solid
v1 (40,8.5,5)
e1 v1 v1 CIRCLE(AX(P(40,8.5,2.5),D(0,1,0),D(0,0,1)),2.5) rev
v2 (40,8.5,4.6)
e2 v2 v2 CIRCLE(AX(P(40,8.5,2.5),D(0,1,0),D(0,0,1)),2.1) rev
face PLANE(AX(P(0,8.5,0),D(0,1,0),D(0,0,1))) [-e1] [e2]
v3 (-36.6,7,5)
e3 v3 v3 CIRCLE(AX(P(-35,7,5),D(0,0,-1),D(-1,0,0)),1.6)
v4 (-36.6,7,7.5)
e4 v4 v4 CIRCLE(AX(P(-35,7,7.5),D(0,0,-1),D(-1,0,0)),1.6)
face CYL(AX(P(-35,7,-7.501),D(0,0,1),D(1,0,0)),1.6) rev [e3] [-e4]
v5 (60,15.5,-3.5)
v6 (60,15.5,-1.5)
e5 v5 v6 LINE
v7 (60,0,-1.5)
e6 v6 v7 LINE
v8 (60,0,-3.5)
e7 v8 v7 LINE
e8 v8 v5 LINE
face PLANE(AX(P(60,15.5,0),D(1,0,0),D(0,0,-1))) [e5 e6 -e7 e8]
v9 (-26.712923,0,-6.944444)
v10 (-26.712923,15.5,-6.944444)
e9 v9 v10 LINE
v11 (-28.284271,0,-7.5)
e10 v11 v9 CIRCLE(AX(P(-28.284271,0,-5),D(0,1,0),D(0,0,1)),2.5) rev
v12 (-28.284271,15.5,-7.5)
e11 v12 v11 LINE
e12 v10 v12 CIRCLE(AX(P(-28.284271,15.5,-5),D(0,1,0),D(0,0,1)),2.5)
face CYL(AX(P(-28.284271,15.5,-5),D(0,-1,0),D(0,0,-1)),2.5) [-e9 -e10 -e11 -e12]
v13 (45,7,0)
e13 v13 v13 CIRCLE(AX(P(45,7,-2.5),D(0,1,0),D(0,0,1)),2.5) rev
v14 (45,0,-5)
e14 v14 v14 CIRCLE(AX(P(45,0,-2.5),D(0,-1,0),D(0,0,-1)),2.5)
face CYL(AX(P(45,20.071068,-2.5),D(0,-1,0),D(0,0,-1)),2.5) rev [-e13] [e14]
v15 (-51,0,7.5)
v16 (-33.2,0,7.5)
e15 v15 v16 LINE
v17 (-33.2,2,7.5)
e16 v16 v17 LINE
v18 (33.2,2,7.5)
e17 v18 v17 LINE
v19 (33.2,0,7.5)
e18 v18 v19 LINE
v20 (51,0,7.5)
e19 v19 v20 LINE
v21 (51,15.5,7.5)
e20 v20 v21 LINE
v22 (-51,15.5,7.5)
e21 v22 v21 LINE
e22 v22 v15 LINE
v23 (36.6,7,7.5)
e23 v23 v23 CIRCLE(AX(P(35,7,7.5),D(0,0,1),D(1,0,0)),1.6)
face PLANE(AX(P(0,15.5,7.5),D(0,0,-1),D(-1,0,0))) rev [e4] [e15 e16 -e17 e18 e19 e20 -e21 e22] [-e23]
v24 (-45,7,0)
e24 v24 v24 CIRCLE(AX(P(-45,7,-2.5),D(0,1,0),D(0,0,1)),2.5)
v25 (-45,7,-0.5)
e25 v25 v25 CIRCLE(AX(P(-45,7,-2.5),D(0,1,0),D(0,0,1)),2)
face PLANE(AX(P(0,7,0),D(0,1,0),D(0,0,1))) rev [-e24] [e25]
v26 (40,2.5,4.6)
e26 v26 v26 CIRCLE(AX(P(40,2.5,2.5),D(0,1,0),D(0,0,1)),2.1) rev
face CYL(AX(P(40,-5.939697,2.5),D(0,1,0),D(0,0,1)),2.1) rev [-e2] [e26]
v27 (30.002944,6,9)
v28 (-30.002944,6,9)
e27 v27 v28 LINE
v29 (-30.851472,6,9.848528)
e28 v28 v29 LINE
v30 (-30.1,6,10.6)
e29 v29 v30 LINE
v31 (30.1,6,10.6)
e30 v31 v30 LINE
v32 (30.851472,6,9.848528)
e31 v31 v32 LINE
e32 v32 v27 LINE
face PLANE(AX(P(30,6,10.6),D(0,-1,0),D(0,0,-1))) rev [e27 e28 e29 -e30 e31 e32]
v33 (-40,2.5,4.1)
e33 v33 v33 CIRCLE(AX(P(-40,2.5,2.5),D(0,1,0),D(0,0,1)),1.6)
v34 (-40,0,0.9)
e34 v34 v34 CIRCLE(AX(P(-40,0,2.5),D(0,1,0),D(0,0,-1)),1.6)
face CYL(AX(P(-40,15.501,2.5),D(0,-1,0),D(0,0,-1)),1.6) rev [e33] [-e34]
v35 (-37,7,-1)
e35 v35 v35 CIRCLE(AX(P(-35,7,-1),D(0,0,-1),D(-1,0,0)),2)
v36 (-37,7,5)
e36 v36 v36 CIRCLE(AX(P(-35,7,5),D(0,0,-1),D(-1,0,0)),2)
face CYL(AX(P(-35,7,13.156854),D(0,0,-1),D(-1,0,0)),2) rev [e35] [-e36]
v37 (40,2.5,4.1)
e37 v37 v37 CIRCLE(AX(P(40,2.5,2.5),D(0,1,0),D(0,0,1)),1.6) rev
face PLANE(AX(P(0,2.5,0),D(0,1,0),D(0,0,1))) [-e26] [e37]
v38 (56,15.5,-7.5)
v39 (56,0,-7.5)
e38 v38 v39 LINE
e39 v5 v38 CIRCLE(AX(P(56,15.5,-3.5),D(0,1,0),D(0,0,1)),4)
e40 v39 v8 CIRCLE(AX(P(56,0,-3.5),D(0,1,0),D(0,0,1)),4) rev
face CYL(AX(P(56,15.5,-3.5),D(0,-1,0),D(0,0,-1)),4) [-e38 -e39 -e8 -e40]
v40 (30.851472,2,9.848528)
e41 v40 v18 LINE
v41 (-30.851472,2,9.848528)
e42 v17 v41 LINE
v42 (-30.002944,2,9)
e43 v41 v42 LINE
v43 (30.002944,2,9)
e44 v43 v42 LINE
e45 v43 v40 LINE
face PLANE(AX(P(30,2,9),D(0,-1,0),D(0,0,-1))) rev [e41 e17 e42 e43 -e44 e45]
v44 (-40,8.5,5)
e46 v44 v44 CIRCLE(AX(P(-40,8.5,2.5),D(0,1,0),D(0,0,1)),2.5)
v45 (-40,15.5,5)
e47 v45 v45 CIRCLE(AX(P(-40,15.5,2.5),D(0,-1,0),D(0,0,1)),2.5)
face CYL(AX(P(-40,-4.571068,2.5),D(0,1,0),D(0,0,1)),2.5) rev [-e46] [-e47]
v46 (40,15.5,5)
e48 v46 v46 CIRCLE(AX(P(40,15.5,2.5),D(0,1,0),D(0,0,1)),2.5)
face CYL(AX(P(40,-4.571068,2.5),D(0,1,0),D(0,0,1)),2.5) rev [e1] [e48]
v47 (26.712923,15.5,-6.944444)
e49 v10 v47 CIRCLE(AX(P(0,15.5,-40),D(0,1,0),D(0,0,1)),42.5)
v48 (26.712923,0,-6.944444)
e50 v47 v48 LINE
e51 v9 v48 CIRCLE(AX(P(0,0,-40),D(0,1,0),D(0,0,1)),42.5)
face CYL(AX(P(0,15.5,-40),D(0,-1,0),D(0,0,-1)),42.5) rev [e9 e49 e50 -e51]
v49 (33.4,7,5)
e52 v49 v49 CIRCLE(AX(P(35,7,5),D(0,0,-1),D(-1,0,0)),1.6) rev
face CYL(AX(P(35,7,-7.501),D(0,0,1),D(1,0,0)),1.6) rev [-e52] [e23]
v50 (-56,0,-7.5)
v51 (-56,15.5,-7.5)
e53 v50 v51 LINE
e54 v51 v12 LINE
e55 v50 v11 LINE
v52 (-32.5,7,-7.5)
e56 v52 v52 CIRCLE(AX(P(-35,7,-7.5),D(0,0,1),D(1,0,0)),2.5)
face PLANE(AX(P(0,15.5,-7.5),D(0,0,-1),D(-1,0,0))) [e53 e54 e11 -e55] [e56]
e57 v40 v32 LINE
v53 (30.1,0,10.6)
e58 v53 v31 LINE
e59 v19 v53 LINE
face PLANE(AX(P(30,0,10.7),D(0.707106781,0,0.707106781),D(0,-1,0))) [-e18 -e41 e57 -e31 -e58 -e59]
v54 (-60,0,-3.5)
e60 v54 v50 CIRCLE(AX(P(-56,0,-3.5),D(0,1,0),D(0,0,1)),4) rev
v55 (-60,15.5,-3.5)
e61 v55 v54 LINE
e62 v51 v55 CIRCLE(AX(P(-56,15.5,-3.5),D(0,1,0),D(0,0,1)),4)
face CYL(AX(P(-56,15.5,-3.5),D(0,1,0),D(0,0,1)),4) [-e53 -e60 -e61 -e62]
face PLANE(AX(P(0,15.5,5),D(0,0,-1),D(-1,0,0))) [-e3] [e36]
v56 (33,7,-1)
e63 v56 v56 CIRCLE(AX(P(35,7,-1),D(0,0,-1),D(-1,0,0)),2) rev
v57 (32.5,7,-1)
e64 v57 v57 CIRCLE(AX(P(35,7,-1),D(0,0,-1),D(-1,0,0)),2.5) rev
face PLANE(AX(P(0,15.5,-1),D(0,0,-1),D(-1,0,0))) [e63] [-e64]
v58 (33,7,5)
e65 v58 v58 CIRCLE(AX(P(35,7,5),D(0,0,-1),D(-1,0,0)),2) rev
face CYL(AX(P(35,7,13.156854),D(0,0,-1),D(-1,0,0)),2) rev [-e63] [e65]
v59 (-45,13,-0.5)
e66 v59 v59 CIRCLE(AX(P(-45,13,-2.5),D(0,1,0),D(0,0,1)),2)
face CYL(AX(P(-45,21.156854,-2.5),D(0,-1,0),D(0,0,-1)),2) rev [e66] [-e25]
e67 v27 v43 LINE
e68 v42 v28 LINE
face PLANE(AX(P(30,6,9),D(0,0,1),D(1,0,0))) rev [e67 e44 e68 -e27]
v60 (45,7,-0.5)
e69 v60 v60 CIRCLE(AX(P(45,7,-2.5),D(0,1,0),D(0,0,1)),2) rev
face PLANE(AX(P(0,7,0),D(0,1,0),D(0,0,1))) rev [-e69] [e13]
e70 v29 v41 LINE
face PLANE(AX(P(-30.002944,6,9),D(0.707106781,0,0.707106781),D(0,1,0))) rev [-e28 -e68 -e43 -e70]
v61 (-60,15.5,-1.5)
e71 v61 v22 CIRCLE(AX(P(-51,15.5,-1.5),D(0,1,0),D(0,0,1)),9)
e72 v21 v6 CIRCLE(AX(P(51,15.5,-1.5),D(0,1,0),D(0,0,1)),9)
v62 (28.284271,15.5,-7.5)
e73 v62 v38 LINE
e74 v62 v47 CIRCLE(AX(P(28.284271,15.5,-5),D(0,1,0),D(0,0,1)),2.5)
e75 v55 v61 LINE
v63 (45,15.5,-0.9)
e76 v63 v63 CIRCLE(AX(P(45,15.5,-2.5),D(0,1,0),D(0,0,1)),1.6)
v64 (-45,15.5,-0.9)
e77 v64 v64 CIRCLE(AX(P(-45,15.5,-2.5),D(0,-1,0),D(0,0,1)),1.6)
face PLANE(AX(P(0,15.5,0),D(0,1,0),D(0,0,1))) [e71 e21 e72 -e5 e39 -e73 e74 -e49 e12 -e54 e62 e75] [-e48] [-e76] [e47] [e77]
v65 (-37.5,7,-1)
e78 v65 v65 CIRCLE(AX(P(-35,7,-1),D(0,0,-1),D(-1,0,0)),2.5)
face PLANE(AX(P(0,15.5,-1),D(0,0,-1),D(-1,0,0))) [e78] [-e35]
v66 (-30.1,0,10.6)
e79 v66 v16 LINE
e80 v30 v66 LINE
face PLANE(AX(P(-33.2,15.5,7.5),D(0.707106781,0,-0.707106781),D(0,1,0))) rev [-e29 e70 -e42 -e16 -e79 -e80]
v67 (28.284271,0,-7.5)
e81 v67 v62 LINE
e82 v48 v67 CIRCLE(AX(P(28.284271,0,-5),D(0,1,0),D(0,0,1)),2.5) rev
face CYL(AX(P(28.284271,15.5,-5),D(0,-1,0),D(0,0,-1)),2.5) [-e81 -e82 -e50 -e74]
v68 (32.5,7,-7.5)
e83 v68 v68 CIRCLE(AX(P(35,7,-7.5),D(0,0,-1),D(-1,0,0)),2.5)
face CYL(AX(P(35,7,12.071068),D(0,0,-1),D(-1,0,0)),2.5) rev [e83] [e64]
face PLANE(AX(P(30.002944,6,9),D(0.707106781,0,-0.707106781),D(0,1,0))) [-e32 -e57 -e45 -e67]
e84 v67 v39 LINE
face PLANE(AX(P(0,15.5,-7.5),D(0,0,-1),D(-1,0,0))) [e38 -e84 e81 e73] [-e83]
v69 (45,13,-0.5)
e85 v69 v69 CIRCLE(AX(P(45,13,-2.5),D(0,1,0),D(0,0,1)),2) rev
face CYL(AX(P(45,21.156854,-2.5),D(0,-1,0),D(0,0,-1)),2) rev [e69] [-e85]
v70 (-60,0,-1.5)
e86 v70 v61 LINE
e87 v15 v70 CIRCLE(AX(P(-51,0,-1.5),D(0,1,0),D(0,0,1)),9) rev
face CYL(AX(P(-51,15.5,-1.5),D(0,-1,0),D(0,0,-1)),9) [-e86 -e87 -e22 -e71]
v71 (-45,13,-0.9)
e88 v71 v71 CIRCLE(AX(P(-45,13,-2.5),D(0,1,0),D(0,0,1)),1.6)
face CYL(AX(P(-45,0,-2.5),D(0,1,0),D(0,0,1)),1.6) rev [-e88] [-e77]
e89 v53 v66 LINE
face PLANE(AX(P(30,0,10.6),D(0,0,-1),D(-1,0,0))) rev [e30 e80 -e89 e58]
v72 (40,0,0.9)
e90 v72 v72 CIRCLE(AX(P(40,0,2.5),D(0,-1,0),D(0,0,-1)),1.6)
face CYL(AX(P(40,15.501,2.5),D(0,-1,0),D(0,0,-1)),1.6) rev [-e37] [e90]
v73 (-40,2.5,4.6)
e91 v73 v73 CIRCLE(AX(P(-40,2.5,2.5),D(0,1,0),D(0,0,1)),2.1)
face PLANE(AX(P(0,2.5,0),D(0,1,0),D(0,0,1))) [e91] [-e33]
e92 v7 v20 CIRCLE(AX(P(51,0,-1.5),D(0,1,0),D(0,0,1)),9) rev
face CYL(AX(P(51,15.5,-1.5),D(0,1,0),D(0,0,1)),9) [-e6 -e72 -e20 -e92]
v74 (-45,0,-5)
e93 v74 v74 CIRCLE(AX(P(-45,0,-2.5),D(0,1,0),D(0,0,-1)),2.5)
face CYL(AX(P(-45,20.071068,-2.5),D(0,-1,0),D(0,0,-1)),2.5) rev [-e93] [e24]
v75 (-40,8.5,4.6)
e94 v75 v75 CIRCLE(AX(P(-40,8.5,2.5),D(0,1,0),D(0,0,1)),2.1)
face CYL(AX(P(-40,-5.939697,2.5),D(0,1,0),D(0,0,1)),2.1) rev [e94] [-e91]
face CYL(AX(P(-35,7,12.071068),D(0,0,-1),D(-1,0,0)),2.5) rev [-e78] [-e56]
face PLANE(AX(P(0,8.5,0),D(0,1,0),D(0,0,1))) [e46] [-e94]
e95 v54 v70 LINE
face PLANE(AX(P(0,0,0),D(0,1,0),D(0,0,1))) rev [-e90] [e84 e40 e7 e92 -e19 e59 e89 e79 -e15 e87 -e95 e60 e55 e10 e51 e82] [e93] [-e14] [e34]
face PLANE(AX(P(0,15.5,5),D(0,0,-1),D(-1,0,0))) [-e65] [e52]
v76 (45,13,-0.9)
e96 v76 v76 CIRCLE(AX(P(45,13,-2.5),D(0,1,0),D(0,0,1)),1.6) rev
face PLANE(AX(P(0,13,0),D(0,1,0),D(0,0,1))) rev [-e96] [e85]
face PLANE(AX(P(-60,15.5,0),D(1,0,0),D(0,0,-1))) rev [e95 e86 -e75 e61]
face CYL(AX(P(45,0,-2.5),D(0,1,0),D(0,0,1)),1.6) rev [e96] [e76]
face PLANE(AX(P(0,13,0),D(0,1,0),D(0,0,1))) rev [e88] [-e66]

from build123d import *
from OCP.BRepFilletAPI import BRepFilletAPI_MakeChamfer, BRepFilletAPI_MakeFillet

# Parameters (mm, degrees)
BOSS_EXTRU_1_DEPTH      = 15.5
BOSS_EXTRU_2_DEPTH      = 30
ESQUISSE2_R             = 1.6
ENL_V_MAT_EXTRU_1_DEPTH = 63.869786066
ESQUISSE3_R             = 2
ENL_V_MAT_EXTRU_2_DEPTH = 13
ESQUISSE9_R             = 2.5
ENL_V_MAT_EXTRU_7_DEPTH = 7
ENL_V_MAT_EXTRU_3_REACH = 64.87
ESQUISSE5_R             = 1.6
ESQUISSE6_R             = 2.1
ENL_V_MAT_EXTRU_4_DEPTH = 13
ESQUISSE10_R            = 2.5
ENL_V_MAT_EXTRU_8_DEPTH = 7
ENL_V_MAT_EXTRU_5_REACH = 65.759
ESQUISSE7_R             = 1.6
ESQUISSE8_R             = 2
ENL_V_MAT_EXTRU_6_DEPTH = 12.5
ESQUISSE11_R            = 2.5
ENL_V_MAT_EXTRU_9_DEPTH = 6.5
CONG_1_R1               = 2.5
CONG_1_R2               = 4
CONG_1_R3               = 9
CHANFREIN1_SIZE         = 3.2
CHANFREIN2_SIZE         = 1.2
CHANFREIN2_SIZE2        = 1.697056275


with BuildPart() as part:
    # Esquisse1 → Boss.-Extru.1 (new body)
    with BuildSketch(Plane(origin=(0, 0, 0), x_dir=(1, 0, 0), z_dir=(0, 1, 0))):
        with BuildLine():
            Line((-27.386127875, 7.5), (-60, 7.5))
            Line((-60, 7.5), (-60, -7.5))
            Line((-60, -7.5), (60, -7.5))
            Line((60, -7.5), (60, 7.5))
            Line((60, 7.5), (27.386127875, 7.5))
            ThreePointArc((27.386127875, 7.5), (0, -2.5), (-27.386127875, 7.5))
        make_face()
    extrude(amount=BOSS_EXTRU_1_DEPTH)

    # Esquisse12 → Boss.-Extru.2 (add, symmetric)
    with BuildSketch(Plane(origin=(0, 0, 0), x_dir=(0, 0, -1), z_dir=(1, 0, 0))):
        Polygon((-7.5, 0), (-10.6, 0), (-10.6, 6), (-9, 6), (-9, 2), (-7.5, 2), align=None)
    extrude(amount=BOSS_EXTRU_2_DEPTH, both=True)

    # Esquisse2 → Enlèv. mat.-Extru.1 (cut, through all)
    with BuildSketch(Plane(origin=(0, 15.5, 0), x_dir=(1, 0, 0), z_dir=(0, 1, 0))):
        with Locations(Location((45, 2.5, 0), (0, 0, 270))):
            Circle(ESQUISSE2_R)
    enl_v_mat_extru_1 = extrude(amount=-ENL_V_MAT_EXTRU_1_DEPTH, mode=Mode.SUBTRACT)

    # Esquisse3 → Enlèv. mat.-Extru.2 (cut)
    with BuildSketch(Plane.XZ):
        with Locations(Location((45, -2.5, 0), (0, 0, 270))):
            Circle(ESQUISSE3_R)
    enl_v_mat_extru_2 = extrude(amount=-ENL_V_MAT_EXTRU_2_DEPTH, mode=Mode.SUBTRACT)

    # Esquisse9 → Enlèv. mat.-Extru.7 (cut)
    with BuildSketch(Plane.XZ):
        with Locations(Location((45, -2.5, 0), (0, 0, 270))):
            Circle(ESQUISSE9_R)
    enl_v_mat_extru_7 = extrude(amount=-ENL_V_MAT_EXTRU_7_DEPTH, mode=Mode.SUBTRACT)

    # Esquisse5 → Enlèv. mat.-Extru.3 (cut, up to next)
    with BuildSketch(Plane.XZ, mode=Mode.PRIVATE) as enl_v_mat_extru_3_sk1:
        with Locations(Location((40, 2.5, 0), (0, 0, 270))):
            Circle(ESQUISSE5_R)
    enl_v_mat_extru_3_tool1 = extrude(enl_v_mat_extru_3_sk1.sketch, amount=-ENL_V_MAT_EXTRU_3_REACH, mode=Mode.PRIVATE) & part.part
    enl_v_mat_extru_3 = enl_v_mat_extru_3_tool1.solids().sort_by_distance((40, 0, 2.5))[0]
    add(enl_v_mat_extru_3, mode=Mode.SUBTRACT)

    # Esquisse6 → Enlèv. mat.-Extru.4 (cut)
    with BuildSketch(Plane(origin=(0, 15.5, 0), x_dir=(1, 0, 0), z_dir=(0, 1, 0))):
        with Locations(Location((40, -2.5, 0), (0, 0, 270))):
            Circle(ESQUISSE6_R)
    enl_v_mat_extru_4 = extrude(amount=-ENL_V_MAT_EXTRU_4_DEPTH, mode=Mode.SUBTRACT)

    # Esquisse10 → Enlèv. mat.-Extru.8 (cut)
    with BuildSketch(Plane(origin=(0, 15.5, 0), x_dir=(1, 0, 0), z_dir=(0, 1, 0))):
        with Locations(Location((40, -2.5, 0), (0, 0, 270))):
            Circle(ESQUISSE10_R)
    enl_v_mat_extru_8 = extrude(amount=-ENL_V_MAT_EXTRU_8_DEPTH, mode=Mode.SUBTRACT)

    # Esquisse7 → Enlèv. mat.-Extru.5 (cut, up to next)
    with BuildSketch(Plane.XY.offset(7.5), mode=Mode.PRIVATE) as enl_v_mat_extru_5_sk1:
        with Locations((35, 7)):
            Circle(ESQUISSE7_R)
    enl_v_mat_extru_5_tool1 = extrude(enl_v_mat_extru_5_sk1.sketch, amount=-ENL_V_MAT_EXTRU_5_REACH, mode=Mode.PRIVATE) & part.part
    enl_v_mat_extru_5 = enl_v_mat_extru_5_tool1.solids().sort_by_distance((35, 7, 7.5))[0]
    add(enl_v_mat_extru_5, mode=Mode.SUBTRACT)

    # Esquisse8 → Enlèv. mat.-Extru.6 (cut)
    with BuildSketch(Plane(origin=(0, 0, -7.5), x_dir=(-1, 0, 0), z_dir=(0, 0, -1))):
        with Locations((-35, 7)):
            Circle(ESQUISSE8_R)
    enl_v_mat_extru_6 = extrude(amount=-ENL_V_MAT_EXTRU_6_DEPTH, mode=Mode.SUBTRACT)

    # Esquisse11 → Enlèv. mat.-Extru.9 (cut)
    with BuildSketch(Plane(origin=(0, 0, -7.5), x_dir=(-1, 0, 0), z_dir=(0, 0, -1))):
        with Locations((-35, 7)):
            Circle(ESQUISSE11_R)
    enl_v_mat_extru_9 = extrude(amount=-ENL_V_MAT_EXTRU_9_DEPTH, mode=Mode.SUBTRACT)

    # Symétrie1: Enlèv. mat.-Extru.1, Enlèv. mat.-Extru.2, Enlèv. mat.-Extru.7, Enlèv. mat.-Extru.3, Enlèv. mat.-Extru.4, Enlèv. mat.-Extru.8, Enlèv. mat.-Extru.5, Enlèv. mat.-Extru.6, Enlèv. mat.-Extru.9 across plane
    add(enl_v_mat_extru_1.mirror(Plane(origin=(0, 0, 0), x_dir=(0, 0, 1), z_dir=(1, 0, 0))), mode=Mode.SUBTRACT)
    add(enl_v_mat_extru_2.mirror(Plane(origin=(0, 0, 0), x_dir=(0, 0, 1), z_dir=(1, 0, 0))), mode=Mode.SUBTRACT)
    add(enl_v_mat_extru_7.mirror(Plane(origin=(0, 0, 0), x_dir=(0, 0, 1), z_dir=(1, 0, 0))), mode=Mode.SUBTRACT)
    add(enl_v_mat_extru_3.mirror(Plane(origin=(0, 0, 0), x_dir=(0, 0, 1), z_dir=(1, 0, 0))), mode=Mode.SUBTRACT)
    add(enl_v_mat_extru_4.mirror(Plane(origin=(0, 0, 0), x_dir=(0, 0, 1), z_dir=(1, 0, 0))), mode=Mode.SUBTRACT)
    add(enl_v_mat_extru_8.mirror(Plane(origin=(0, 0, 0), x_dir=(0, 0, 1), z_dir=(1, 0, 0))), mode=Mode.SUBTRACT)
    add(enl_v_mat_extru_5.mirror(Plane(origin=(0, 0, 0), x_dir=(0, 0, 1), z_dir=(1, 0, 0))), mode=Mode.SUBTRACT)
    add(enl_v_mat_extru_6.mirror(Plane(origin=(0, 0, 0), x_dir=(0, 0, 1), z_dir=(1, 0, 0))), mode=Mode.SUBTRACT)
    add(enl_v_mat_extru_9.mirror(Plane(origin=(0, 0, 0), x_dir=(0, 0, 1), z_dir=(1, 0, 0))), mode=Mode.SUBTRACT)

    # Congé1: one fillet with a radius per group of edges: ONE call of the kernel's fillet builder (fillet() takes one radius for all edges)
    cong_1_edges_1 = [part.edges().sort_by_distance(p)[0] for p in [
        (27.386127875, 7.75, -7.5),
        (-27.386127875, 7.75, -7.5),
    ]]
    cong_1_edges_2 = [part.edges().sort_by_distance(p)[0] for p in [
        (60, 7.75, -7.5),
        (-60, 7.75, -7.5),
    ]]
    cong_1_edges_3 = [part.edges().sort_by_distance(p)[0] for p in [
        (60, 7.75, 7.5),
        (-60, 7.75, 7.5),
    ]]
    cong_1 = BRepFilletAPI_MakeFillet(part.part.solid().wrapped)
    for e in cong_1_edges_1:
        cong_1.Add(CONG_1_R1, e.wrapped)
    for e in cong_1_edges_2:
        cong_1.Add(CONG_1_R2, e.wrapped)
    for e in cong_1_edges_3:
        cong_1.Add(CONG_1_R3, e.wrapped)
    add(Compound.cast(cong_1.Shape()), mode=Mode.REPLACE)

    # Chanfrein1
    # the kernel refuses this chamfer: 3.2 mm, written as the material it adds along each edge
    with BuildSketch(Plane(origin=(30, 10.229385561, 7.5), x_dir=(0.9996219169112968, 0, -0.027495876610586226), z_dir=(0, -1, 0))) as chanfrein1_piece_1_section:
        Polygon((CHANFREIN1_SIZE * 0.999621916911, CHANFREIN1_SIZE * 0.0274958766106), (-CHANFREIN1_SIZE * 0.0274958766106, CHANFREIN1_SIZE * 0.999621916911), (0, 0), align=None)
    chanfrein1_piece_1 = extrude(amount=10.229385561, mode=Mode.PRIVATE)
    chanfrein1_piece_1 = split(chanfrein1_piece_1, bisect_by=Plane(origin=(30.510820254, 2, 9.595713626), z_dir=(0, 1, 0)), keep=Keep.TOP, mode=Mode.PRIVATE)
    chanfrein1_piece_1 = split(chanfrein1_piece_1, bisect_by=Plane(origin=(30.510820254, 4, 10.6), z_dir=(0, 0, -1)), keep=Keep.TOP, mode=Mode.PRIVATE)
    chanfrein1_piece_1 = split(chanfrein1_piece_1, bisect_by=Plane(origin=(30.510820254, 6, 9.595713626), z_dir=(0, -1, 0)), keep=Keep.TOP, mode=Mode.PRIVATE)
    chanfrein1_piece_1 = split(chanfrein1_piece_1, bisect_by=Plane(origin=(30.510820254, 4, 9), z_dir=(0, 0, 1)), keep=Keep.TOP, mode=Mode.PRIVATE)
    add(chanfrein1_piece_1)
    with BuildSketch(Plane(origin=(30, 2, 7.5), x_dir=(0.9996219169112966, 0, -0.02749587661058616), z_dir=(0, -1, 0))) as chanfrein1_piece_2_section:
        Polygon((CHANFREIN1_SIZE * 0.999621916911, CHANFREIN1_SIZE * 0.0274958766106), (-CHANFREIN1_SIZE * 0.0274958766106, CHANFREIN1_SIZE * 0.999621916911), (0, 0), align=None)
    chanfrein1_piece_2 = extrude(amount=2, mode=Mode.PRIVATE)
    chanfrein1_piece_2 = split(chanfrein1_piece_2, bisect_by=Plane(origin=(31.278670845, 1, 9), z_dir=(0, 0, -1)), keep=Keep.TOP, mode=Mode.PRIVATE)
    add(chanfrein1_piece_2)
    with BuildSketch(Plane(origin=(30, 2, 7.5), x_dir=(0.9996219169112966, 0, -0.02749587661058616), z_dir=(0, -1, 0))) as chanfrein1_piece_3_section:
        Polygon((CHANFREIN1_SIZE * 0.999621916911, CHANFREIN1_SIZE * 0.0274958766106), (-CHANFREIN1_SIZE * 0.0274958766106, CHANFREIN1_SIZE * 0.999621916911), (0, 0), align=None)
    chanfrein1_piece_3 = extrude(amount=2, mode=Mode.PRIVATE)
    chanfrein1_piece_3 = split(chanfrein1_piece_3, bisect_by=Plane(origin=(30.510820254, 1, 10.6), z_dir=(0, 0, -1)), keep=Keep.TOP, mode=Mode.PRIVATE)
    chanfrein1_piece_3 = split(chanfrein1_piece_3, bisect_by=Plane(origin=(30.510820254, 1, 9), z_dir=(0, 0, 1)), keep=Keep.TOP, mode=Mode.PRIVATE)
    add(chanfrein1_piece_3)
    with BuildSketch(Plane(origin=(-30, 10.229385561, 7.5), x_dir=(-0.9996219169112968, 0, -0.027495876610586226), z_dir=(0, -1, 0))) as chanfrein1_piece_4_section:
        Polygon((CHANFREIN1_SIZE * 0.999621916911, -CHANFREIN1_SIZE * 0.0274958766106), (-CHANFREIN1_SIZE * 0.0274958766106, -CHANFREIN1_SIZE * 0.999621916911), (0, 0), align=None)
    chanfrein1_piece_4 = extrude(amount=10.229385561, mode=Mode.PRIVATE)
    chanfrein1_piece_4 = split(chanfrein1_piece_4, bisect_by=Plane(origin=(-30.510820254, 2, 9.595713626), z_dir=(0, 1, 0)), keep=Keep.TOP, mode=Mode.PRIVATE)
    chanfrein1_piece_4 = split(chanfrein1_piece_4, bisect_by=Plane(origin=(-30.510820254, 4, 10.6), z_dir=(0, 0, -1)), keep=Keep.TOP, mode=Mode.PRIVATE)
    chanfrein1_piece_4 = split(chanfrein1_piece_4, bisect_by=Plane(origin=(-30.510820254, 6, 9.595713626), z_dir=(0, -1, 0)), keep=Keep.TOP, mode=Mode.PRIVATE)
    chanfrein1_piece_4 = split(chanfrein1_piece_4, bisect_by=Plane(origin=(-30.510820254, 4, 9), z_dir=(0, 0, 1)), keep=Keep.TOP, mode=Mode.PRIVATE)
    add(chanfrein1_piece_4)
    with BuildSketch(Plane(origin=(-30, 2, 7.5), x_dir=(-0.9996219169112968, 0, -0.027495876610586226), z_dir=(0, -1, 0))) as chanfrein1_piece_5_section:
        Polygon((CHANFREIN1_SIZE * 0.999621916911, -CHANFREIN1_SIZE * 0.0274958766106), (-CHANFREIN1_SIZE * 0.0274958766106, -CHANFREIN1_SIZE * 0.999621916911), (0, 0), align=None)
    chanfrein1_piece_5 = extrude(amount=2, mode=Mode.PRIVATE)
    chanfrein1_piece_5 = split(chanfrein1_piece_5, bisect_by=Plane(origin=(-31.278670845, 1, 9), z_dir=(0, 0, -1)), keep=Keep.TOP, mode=Mode.PRIVATE)
    add(chanfrein1_piece_5)
    with BuildSketch(Plane(origin=(-30, 2, 7.5), x_dir=(-0.9996219169112968, 0, -0.027495876610586226), z_dir=(0, -1, 0))) as chanfrein1_piece_6_section:
        Polygon((CHANFREIN1_SIZE * 0.999621916911, -CHANFREIN1_SIZE * 0.0274958766106), (-CHANFREIN1_SIZE * 0.0274958766106, -CHANFREIN1_SIZE * 0.999621916911), (0, 0), align=None)
    chanfrein1_piece_6 = extrude(amount=2, mode=Mode.PRIVATE)
    chanfrein1_piece_6 = split(chanfrein1_piece_6, bisect_by=Plane(origin=(-30.510820254, 1, 10.6), z_dir=(0, 0, -1)), keep=Keep.TOP, mode=Mode.PRIVATE)
    chanfrein1_piece_6 = split(chanfrein1_piece_6, bisect_by=Plane(origin=(-30.510820254, 1, 9), z_dir=(0, 0, 1)), keep=Keep.TOP, mode=Mode.PRIVATE)
    add(chanfrein1_piece_6)

    # Chanfrein2: one chamfer whose edges measure the first distance from different faces: ONE call of the kernel's chamfer builder (chamfer() names one face for all edges)
    chanfrein2_edges_1 = [part.edges().sort_by_distance(p)[0] for p in [
        (31.7, 4, 9),
    ]]
    chanfrein2_side_1 = [part.faces().sort_by_distance(p)[0] for p in [
        (31.269047619, 2.523809524, 9.430952381),
    ]]
    chanfrein2_edges_2 = [part.edges().sort_by_distance(p)[0] for p in [
        (-31.7, 4, 9),
    ]]
    chanfrein2_side_2 = [part.faces().sort_by_distance(p)[0] for p in [
        (-31.269047619, 2.523809524, 9.430952381),
    ]]
    chanfrein2 = BRepFilletAPI_MakeChamfer(part.part.solid().wrapped)
    for e in chanfrein2_edges_1:
        chanfrein2.Add(CHANFREIN2_SIZE, CHANFREIN2_SIZE2, e.wrapped, chanfrein2_side_1[0].wrapped)  # the first distance lies on this face
    for e in chanfrein2_edges_2:
        chanfrein2.Add(CHANFREIN2_SIZE, CHANFREIN2_SIZE2, e.wrapped, chanfrein2_side_2[0].wrapped)  # the first distance lies on this face
    add(Compound.cast(chanfrein2.Shape()), mode=Mode.REPLACE)


solid = part.part
